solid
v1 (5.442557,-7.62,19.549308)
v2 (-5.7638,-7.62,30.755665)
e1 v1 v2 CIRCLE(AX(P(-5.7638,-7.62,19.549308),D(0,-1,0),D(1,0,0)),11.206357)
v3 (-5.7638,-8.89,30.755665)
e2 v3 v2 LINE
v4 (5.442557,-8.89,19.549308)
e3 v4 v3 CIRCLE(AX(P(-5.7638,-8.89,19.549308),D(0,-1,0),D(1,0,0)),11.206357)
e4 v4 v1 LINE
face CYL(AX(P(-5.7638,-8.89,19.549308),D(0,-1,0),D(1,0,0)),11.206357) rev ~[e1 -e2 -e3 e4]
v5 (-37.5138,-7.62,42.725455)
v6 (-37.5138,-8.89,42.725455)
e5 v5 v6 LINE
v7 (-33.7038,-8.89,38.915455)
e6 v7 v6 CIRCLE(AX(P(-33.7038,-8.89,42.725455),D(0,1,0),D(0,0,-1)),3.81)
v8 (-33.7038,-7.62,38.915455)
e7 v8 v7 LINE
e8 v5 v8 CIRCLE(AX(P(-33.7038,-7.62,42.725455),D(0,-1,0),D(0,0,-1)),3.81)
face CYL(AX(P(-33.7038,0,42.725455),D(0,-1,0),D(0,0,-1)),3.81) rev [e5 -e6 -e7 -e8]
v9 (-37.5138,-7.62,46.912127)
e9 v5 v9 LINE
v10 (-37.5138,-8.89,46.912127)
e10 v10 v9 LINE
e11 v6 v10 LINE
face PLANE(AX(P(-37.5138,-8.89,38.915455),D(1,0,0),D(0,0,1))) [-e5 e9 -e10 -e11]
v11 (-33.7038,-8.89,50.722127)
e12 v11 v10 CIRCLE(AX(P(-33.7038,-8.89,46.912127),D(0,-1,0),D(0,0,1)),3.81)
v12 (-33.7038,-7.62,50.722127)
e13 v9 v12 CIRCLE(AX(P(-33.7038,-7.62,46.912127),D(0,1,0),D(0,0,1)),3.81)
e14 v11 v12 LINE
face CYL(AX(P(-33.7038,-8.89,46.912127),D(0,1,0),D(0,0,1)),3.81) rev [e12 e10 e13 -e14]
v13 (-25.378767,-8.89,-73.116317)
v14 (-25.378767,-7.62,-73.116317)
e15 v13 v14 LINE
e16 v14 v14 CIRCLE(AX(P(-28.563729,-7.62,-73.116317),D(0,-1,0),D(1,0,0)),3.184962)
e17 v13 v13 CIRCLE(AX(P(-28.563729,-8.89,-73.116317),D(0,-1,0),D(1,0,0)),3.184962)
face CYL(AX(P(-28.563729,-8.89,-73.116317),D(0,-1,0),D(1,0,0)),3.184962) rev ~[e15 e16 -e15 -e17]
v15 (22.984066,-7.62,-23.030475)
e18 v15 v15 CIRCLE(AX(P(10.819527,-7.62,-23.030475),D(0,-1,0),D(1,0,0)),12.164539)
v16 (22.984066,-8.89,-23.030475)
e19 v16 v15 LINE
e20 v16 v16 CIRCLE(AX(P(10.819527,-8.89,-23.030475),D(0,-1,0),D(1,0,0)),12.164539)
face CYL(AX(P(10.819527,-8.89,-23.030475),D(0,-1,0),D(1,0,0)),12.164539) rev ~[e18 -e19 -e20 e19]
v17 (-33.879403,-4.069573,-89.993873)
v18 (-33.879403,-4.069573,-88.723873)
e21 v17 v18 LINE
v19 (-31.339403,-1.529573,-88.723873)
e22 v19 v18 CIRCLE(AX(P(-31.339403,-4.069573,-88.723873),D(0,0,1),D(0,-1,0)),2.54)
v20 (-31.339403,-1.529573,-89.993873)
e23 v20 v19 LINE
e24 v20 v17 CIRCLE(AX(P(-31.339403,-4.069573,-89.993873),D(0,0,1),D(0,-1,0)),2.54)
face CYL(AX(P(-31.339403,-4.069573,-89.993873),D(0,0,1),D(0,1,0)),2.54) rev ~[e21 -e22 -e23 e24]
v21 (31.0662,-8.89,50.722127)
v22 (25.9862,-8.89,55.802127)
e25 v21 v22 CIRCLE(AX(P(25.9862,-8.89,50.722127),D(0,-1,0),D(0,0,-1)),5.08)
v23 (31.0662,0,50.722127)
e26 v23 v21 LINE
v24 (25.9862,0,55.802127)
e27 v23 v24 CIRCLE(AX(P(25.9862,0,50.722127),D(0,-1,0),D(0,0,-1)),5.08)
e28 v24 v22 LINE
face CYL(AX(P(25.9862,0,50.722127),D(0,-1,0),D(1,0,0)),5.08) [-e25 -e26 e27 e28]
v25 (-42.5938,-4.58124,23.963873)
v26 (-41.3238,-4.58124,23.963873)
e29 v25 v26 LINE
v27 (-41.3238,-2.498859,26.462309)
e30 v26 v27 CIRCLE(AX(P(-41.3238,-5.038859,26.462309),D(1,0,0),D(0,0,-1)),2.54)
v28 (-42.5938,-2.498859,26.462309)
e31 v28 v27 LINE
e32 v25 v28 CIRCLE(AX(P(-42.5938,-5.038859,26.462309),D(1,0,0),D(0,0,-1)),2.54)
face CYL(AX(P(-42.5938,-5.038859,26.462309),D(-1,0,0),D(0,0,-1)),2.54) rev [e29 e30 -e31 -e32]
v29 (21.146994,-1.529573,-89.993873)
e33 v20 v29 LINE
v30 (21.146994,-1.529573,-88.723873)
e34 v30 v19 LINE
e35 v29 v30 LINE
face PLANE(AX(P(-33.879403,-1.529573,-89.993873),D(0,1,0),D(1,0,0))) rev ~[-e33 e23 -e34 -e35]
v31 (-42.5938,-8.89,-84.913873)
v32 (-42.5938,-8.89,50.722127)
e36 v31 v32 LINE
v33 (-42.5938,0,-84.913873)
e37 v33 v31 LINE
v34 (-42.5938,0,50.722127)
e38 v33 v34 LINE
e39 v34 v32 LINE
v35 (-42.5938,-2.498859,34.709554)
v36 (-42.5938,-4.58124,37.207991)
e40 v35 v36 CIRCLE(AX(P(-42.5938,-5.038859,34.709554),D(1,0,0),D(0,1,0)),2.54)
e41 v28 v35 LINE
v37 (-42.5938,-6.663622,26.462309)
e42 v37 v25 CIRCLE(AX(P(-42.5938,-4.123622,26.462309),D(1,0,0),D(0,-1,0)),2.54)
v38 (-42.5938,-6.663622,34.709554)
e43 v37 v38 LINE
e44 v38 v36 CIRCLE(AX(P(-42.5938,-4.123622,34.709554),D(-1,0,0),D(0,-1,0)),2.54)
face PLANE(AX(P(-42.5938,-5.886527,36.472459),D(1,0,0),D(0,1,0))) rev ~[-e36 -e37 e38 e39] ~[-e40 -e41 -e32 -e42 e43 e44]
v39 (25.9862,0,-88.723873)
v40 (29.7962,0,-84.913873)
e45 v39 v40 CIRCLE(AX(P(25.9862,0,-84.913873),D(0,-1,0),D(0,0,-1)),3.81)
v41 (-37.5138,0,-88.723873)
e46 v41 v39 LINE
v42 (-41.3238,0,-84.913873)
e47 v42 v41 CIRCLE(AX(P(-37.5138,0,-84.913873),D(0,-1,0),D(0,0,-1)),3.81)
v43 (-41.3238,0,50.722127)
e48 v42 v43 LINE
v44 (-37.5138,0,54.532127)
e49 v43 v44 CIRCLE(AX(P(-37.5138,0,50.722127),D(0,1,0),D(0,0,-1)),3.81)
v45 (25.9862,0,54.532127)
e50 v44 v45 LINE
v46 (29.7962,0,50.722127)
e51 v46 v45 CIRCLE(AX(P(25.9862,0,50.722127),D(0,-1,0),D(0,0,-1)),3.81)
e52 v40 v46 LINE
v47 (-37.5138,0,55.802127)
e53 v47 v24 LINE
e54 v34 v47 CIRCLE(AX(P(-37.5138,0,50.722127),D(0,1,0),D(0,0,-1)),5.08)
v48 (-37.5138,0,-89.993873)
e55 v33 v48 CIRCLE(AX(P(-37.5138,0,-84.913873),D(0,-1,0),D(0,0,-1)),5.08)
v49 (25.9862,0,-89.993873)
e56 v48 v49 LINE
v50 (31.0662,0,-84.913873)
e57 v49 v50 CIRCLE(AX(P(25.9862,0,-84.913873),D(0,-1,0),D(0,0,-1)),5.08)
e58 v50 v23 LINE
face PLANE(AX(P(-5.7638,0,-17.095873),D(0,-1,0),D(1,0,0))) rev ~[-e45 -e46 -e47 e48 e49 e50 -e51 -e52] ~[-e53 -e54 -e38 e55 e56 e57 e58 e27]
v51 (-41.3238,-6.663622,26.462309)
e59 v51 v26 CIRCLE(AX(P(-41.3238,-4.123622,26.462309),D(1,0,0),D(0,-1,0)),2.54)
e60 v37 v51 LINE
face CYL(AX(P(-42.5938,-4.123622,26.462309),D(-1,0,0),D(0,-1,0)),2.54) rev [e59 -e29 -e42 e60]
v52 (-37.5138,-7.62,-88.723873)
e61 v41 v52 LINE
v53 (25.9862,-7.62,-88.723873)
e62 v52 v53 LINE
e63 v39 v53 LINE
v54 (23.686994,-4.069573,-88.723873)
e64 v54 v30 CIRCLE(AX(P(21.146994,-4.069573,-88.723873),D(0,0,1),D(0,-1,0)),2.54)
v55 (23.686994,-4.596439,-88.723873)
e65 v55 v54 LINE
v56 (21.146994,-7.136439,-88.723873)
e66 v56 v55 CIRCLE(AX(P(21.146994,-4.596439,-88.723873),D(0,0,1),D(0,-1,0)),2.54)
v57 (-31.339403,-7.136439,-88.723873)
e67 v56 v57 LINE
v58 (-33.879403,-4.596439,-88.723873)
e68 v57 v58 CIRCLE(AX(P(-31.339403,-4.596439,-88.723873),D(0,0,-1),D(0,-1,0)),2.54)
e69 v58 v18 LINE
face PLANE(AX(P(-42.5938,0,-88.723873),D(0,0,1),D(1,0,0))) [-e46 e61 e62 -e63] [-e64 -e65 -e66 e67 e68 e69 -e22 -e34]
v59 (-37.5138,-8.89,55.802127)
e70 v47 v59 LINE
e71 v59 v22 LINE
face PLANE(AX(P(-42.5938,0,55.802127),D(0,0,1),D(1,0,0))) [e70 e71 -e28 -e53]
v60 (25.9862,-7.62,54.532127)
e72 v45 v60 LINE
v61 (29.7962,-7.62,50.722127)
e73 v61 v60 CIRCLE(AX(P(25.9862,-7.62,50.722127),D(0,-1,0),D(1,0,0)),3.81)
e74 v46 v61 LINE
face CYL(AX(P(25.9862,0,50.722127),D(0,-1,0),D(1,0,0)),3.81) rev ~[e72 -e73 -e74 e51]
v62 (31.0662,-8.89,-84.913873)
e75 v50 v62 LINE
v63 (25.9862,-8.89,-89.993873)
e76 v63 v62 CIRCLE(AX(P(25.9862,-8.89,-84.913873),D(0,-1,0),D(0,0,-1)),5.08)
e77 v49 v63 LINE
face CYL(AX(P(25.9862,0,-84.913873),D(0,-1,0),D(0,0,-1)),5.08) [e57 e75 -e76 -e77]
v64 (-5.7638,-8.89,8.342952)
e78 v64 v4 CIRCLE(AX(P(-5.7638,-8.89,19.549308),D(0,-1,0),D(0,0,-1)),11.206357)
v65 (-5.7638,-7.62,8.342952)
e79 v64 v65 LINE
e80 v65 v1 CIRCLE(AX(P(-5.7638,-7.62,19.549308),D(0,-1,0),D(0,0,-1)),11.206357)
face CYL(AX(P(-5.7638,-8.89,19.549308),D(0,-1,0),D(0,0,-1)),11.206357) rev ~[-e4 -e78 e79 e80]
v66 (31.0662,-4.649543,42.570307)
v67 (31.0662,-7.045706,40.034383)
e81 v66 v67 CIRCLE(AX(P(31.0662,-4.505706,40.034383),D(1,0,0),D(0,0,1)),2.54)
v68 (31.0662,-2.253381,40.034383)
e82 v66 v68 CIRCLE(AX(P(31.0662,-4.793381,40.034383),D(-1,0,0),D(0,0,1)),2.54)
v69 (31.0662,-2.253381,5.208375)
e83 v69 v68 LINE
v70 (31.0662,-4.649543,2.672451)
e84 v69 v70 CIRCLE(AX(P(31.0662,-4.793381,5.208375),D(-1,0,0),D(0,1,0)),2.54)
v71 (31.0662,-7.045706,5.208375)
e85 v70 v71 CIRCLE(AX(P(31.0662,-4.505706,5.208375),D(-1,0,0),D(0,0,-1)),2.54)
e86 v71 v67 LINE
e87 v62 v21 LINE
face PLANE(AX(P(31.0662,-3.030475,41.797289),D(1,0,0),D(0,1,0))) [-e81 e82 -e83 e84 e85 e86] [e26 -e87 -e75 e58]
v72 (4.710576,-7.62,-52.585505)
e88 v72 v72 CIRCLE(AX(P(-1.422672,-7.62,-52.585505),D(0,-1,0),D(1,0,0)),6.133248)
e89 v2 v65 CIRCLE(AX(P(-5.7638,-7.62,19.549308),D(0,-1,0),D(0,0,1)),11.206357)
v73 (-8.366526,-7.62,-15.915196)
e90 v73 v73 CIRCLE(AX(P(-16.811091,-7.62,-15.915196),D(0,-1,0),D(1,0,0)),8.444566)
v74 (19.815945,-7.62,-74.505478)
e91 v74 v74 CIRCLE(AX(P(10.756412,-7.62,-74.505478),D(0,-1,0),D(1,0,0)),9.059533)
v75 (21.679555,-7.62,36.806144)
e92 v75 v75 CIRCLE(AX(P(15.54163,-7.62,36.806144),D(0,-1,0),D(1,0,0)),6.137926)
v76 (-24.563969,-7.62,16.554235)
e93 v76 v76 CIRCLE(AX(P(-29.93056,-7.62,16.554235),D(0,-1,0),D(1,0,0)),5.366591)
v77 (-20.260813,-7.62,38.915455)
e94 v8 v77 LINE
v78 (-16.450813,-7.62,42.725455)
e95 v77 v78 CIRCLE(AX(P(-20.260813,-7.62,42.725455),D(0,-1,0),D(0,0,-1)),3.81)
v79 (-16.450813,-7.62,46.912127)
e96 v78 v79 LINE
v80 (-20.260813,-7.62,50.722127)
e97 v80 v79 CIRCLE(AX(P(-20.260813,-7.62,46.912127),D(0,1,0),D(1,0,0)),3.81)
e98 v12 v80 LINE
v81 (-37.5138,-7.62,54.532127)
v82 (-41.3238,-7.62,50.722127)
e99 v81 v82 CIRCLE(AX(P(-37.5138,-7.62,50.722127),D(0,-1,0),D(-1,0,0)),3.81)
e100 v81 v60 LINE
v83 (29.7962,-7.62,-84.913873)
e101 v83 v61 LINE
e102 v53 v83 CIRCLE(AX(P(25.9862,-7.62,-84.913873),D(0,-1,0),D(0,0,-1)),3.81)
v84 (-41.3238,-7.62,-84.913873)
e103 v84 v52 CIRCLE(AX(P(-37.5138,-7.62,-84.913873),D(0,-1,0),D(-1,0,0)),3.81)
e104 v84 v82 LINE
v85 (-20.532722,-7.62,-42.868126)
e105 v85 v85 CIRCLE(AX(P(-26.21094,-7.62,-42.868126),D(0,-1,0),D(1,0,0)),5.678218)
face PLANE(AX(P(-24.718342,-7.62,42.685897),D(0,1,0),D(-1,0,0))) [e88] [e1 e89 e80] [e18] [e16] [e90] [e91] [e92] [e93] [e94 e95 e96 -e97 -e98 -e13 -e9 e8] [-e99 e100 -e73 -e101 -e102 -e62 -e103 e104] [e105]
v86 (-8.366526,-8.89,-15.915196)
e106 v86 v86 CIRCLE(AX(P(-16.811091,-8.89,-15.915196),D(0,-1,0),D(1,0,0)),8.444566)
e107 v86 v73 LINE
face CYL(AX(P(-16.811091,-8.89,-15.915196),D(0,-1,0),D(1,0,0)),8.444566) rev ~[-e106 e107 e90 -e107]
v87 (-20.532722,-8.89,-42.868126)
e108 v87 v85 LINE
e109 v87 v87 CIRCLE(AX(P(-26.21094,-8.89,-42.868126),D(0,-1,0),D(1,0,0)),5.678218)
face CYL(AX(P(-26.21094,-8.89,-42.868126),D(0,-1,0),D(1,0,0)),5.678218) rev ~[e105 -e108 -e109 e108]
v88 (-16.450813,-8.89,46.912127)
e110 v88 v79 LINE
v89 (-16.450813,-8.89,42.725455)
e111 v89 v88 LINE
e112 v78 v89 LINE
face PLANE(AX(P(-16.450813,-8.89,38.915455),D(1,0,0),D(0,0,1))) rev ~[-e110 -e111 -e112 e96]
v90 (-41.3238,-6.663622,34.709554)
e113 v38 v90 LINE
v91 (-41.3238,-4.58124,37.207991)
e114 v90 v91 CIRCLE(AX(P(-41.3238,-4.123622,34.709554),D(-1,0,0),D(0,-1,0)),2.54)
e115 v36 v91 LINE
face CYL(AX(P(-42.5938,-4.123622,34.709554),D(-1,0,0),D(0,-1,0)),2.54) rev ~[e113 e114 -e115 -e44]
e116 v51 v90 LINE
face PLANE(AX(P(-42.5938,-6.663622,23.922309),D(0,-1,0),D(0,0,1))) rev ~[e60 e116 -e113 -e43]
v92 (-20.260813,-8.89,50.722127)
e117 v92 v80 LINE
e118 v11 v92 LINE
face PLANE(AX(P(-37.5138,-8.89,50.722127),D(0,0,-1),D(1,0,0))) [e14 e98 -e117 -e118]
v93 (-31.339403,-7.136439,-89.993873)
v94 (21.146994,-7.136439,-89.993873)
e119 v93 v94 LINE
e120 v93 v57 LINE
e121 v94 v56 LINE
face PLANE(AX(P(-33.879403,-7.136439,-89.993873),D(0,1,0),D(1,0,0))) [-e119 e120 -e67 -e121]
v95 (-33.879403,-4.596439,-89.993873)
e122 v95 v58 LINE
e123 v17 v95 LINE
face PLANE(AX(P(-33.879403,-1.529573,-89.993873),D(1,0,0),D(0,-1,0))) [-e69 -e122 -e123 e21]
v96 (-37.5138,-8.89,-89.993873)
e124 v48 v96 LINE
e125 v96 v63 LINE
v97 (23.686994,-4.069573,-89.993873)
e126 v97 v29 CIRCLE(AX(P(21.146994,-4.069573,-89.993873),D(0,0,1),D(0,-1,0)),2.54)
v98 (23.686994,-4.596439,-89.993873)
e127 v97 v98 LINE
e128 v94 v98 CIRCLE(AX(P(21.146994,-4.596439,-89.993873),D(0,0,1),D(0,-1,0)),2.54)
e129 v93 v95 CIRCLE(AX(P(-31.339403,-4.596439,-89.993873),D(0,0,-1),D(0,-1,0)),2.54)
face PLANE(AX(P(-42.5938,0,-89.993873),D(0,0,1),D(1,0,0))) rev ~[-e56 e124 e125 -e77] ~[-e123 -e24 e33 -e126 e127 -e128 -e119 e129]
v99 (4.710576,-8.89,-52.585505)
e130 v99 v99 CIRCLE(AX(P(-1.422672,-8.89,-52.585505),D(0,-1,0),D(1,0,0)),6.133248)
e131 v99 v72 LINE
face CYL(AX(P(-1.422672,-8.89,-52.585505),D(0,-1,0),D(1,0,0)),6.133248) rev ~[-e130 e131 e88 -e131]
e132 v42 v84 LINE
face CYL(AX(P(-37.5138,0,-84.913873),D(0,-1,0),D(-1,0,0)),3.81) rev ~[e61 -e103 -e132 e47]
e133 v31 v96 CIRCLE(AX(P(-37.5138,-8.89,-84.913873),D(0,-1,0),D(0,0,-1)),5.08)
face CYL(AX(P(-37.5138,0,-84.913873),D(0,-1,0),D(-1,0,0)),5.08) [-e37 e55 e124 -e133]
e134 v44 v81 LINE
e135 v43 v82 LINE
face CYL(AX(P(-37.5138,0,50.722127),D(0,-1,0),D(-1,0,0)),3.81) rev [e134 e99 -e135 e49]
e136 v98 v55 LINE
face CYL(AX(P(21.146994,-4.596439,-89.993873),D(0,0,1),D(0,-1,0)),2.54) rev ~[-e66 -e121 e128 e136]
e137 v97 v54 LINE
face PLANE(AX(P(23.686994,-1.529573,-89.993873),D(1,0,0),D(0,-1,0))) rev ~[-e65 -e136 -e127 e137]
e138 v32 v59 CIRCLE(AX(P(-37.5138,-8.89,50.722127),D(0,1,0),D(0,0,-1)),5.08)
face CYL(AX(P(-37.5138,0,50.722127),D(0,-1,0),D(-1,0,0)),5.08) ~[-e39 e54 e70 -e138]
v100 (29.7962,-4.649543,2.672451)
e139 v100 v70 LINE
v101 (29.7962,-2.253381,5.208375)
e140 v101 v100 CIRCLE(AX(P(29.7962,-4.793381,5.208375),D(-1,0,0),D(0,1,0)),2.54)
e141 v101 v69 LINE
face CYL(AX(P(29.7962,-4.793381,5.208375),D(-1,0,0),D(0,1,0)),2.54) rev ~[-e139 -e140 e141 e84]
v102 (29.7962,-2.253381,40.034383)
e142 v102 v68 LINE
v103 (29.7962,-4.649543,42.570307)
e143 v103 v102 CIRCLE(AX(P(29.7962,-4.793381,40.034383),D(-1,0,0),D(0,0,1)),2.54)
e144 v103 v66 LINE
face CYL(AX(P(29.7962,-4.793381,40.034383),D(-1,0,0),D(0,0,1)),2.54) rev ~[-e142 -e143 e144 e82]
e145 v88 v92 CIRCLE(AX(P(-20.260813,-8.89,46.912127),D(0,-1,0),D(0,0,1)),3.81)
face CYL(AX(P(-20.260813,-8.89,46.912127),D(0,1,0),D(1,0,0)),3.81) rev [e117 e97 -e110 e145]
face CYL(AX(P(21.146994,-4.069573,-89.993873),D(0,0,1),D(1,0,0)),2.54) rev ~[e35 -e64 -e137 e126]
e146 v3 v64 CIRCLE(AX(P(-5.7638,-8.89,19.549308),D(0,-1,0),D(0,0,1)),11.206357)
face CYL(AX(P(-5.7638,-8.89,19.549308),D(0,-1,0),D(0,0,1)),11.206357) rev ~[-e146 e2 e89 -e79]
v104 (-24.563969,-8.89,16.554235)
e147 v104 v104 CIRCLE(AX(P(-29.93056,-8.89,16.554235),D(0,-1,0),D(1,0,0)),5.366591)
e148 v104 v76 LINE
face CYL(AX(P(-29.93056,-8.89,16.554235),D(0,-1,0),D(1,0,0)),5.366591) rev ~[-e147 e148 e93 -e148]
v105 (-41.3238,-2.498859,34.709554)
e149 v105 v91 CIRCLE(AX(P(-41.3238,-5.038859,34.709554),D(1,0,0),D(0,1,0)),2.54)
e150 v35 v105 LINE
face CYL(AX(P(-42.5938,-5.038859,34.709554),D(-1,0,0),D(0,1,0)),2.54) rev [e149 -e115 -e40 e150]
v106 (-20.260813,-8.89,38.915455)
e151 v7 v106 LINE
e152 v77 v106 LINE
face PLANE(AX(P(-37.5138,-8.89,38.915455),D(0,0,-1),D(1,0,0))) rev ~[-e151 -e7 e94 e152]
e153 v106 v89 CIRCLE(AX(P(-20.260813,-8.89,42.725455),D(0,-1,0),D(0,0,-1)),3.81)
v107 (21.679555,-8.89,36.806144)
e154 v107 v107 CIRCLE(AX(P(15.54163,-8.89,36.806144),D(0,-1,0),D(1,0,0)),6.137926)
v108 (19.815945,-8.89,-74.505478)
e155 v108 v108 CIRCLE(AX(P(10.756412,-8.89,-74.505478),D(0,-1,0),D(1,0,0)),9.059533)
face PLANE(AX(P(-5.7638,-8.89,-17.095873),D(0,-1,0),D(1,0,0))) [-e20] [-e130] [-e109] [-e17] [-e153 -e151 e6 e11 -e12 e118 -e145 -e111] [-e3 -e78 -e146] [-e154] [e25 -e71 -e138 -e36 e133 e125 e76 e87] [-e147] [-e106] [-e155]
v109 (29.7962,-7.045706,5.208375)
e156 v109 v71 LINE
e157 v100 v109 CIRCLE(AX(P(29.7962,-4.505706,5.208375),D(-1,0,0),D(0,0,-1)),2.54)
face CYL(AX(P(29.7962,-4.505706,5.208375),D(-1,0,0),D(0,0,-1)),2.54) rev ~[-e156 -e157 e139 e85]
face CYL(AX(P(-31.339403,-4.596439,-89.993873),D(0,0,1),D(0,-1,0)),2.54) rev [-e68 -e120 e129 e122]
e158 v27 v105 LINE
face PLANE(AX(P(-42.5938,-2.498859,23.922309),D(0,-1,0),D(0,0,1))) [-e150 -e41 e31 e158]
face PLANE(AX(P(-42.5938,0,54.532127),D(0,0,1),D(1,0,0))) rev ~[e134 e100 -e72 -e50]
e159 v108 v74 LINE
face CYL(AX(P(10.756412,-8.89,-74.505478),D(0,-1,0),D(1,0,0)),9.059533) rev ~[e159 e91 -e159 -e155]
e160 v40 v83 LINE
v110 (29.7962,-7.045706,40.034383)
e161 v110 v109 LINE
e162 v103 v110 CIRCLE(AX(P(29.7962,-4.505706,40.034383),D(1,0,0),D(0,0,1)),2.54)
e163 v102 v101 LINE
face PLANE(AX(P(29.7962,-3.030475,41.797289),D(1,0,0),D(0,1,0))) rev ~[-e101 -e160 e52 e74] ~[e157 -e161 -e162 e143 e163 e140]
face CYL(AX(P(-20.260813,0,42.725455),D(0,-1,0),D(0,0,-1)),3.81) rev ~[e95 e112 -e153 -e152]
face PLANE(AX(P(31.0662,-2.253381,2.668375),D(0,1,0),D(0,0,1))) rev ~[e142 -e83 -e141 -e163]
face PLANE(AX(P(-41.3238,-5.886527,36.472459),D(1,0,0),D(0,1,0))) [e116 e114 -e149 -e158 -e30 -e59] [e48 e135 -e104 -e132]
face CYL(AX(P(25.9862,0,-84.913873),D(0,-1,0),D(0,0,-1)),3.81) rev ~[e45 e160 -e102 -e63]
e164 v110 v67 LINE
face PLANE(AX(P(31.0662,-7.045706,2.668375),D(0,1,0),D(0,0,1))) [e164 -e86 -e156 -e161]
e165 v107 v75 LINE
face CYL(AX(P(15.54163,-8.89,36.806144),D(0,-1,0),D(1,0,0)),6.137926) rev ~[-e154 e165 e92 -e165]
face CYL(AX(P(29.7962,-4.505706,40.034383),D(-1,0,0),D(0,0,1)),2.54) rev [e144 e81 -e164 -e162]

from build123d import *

# Parameters (mm, degrees)
F0_W         = 73.66
F0_H         = 145.796
F1_DEPTH     = 8.89
F2_R         = 5.08
F3_W         = 21.0629868459
F3_H         = 11.8066714083
F4_DEPTH     = 12.7
F5_R         = 3.81
F7_T         = -1.27
F9_DEPTH     = 7.62
F10_W        = 4.164762795
F10_H        = 13.3272446692
F11_DEPTH    = 25.4
F12_T1_DEPTH = 1.27
F13_W        = 57.5663968921
F13_H        = 5.6068669073
F14_DEPTH    = 25.4
F15_R        = 2.54
F16_W        = 4.7923256643
F16_H        = 39.9060079362
F17_DEPTH    = 25.4
F18_T1_DEPTH = 1.27
F20_DEPTH    = 25.4
F21_R        = 12.1645390549
F21_R_2      = 8.4445659424
F21_R_3      = 5.6782177744
F21_R_4      = 6.1332477191
F21_R_5      = 9.0595333528
F21_R_6      = 3.1849618728
F21_R_7      = 5.3665907278
F21_R_8      = 6.1379255293
F22_DEPTH    = 25.4


# Not quite as in the source:
# - a fillet or chamfer that OpenCascade refuses, or shapes differently, is made with other operations: its cross-section is extruded or revolved along the edge and cut away or added


with BuildPart() as f1:
    # F0 (on Front) → F1 (new body)
    with BuildSketch(Plane.XZ):
        with Locations((-5.763799886, -17.0958732503)):
            Rectangle(F0_W, F0_H)
    extrude(amount=F1_DEPTH)

    # F2
    f2_edges = [f1.edges().sort_by_distance(p)[0] for p in [
        (31.0662, -4.445, 55.802127),
        (-42.5938, -4.445, 55.802127),
        (31.0662, -4.445, -89.993873),
        (-42.5938, -4.445, -89.993873),
    ]]
    fillet(f2_edges, radius=F2_R)

    # F3 (on face) → F4 (cut, symmetric)
    with BuildSketch(Plane.XZ.offset(8.89)):
        with Locations((-26.9823064631, 44.8187910455)):
            Rectangle(F3_W, F3_H)
    extrude(amount=F4_DEPTH, both=True, mode=Mode.SUBTRACT)

    # F5
    f5_edges = [f1.edges().sort_by_distance(p)[0] for p in [
        (-16.450813, -4.445, 50.722127),
        (-37.5138, -4.445, 50.722127),
        (-37.5138, -4.445, 38.915455),
        (-16.450813, -4.445, 38.915455),
    ]]
    fillet(f5_edges, radius=F5_R)

    # F7
    f7_openings = [f1.faces().sort_by_distance(p)[0] for p in [
        (-5.285571, 0, -18.491325),
    ]]
    offset(amount=F7_T, openings=f7_openings)

    # F8 (on face) → F9 (cut)
    with BuildSketch(Plane(origin=(0, 0, 0), x_dir=(-1, 0, 0), z_dir=(0, 1, 0))):
        Polygon((23.2353508472, 53.487226367), (11.2448604777, 51.826223731), (11.2448604777, 31.8353585899), (37.2746288776, 33.5012637079), (40.1331484318, 42.7181646228), (38.7322939932, 52.0863756537), align=None)
    extrude(amount=-F9_DEPTH, mode=Mode.SUBTRACT)

    # F10 (on face) → F11 (cut)
    with BuildSketch(Plane(origin=(-42.593799886, 0, 0), x_dir=(0, -1, 0), z_dir=(-1, 0, 0))):
        with Locations((4.5812404715, 30.585931614)):
            Rectangle(F10_W, F10_H)
    extrude(amount=-F11_DEPTH, mode=Mode.SUBTRACT)

    # F12: fillet of radius 2.54 on 4 edges, made by hand

    # F12_s2 → F12_t1 (join)
    with BuildSketch(Plane.YZ.offset(-42.593799886)):
        with BuildLine():
            ThreePointArc((-6.6636218689, 34.7095539486), (-5.9196730932, 36.5056051729), (-4.1236218689, 37.2495539486))
            Line((-4.1236218689, 37.2495539486), (-6.6636218689, 37.2495539486))
            Line((-6.6636218689, 37.2495539486), (-6.6636218689, 34.7095539486))
        make_face()
        with BuildLine():
            ThreePointArc((-6.6636218689, 26.4623092794), (-5.9196730932, 24.6662580552), (-4.1236218689, 23.9223092794))
            Line((-4.1236218689, 23.9223092794), (-6.6636218689, 23.9223092794))
            Line((-6.6636218689, 23.9223092794), (-6.6636218689, 26.4623092794))
        make_face()
        with BuildLine():
            ThreePointArc((-2.498859074, 34.7095539486), (-3.2428078498, 36.5056051729), (-5.038859074, 37.2495539486))
            Line((-5.038859074, 37.2495539486), (-2.498859074, 37.2495539486))
            Line((-2.498859074, 37.2495539486), (-2.498859074, 34.7095539486))
        make_face()
        with BuildLine():
            ThreePointArc((-5.038859074, 23.9223092794), (-3.2428078498, 24.6662580552), (-2.498859074, 26.4623092794))
            Line((-2.498859074, 26.4623092794), (-2.498859074, 23.9223092794))
            Line((-2.498859074, 23.9223092794), (-5.038859074, 23.9223092794))
        make_face()
    extrude(amount=F12_T1_DEPTH)

    # F13 (on face) → F14 (cut)
    with BuildSketch(Plane(origin=(0, 0, -89.9938732503), x_dir=(1, 0, 0), z_dir=(0, 0, -1))):
        with Locations((-5.0962045789, 4.3330059852)):
            Rectangle(F13_W, F13_H)
    extrude(amount=-F14_DEPTH, mode=Mode.SUBTRACT)

    # F15
    f15_edges = [f1.edges().sort_by_distance(p)[0] for p in [
        (-33.879403, -7.136439, -89.358873),
        (23.686994, -7.136439, -89.358873),
        (-33.879403, -1.529573, -89.358873),
        (23.686994, -1.529573, -89.358873),
    ]]
    fillet(f15_edges, radius=F15_R)

    # F16 (on face) → F17 (cut)
    with BuildSketch(Plane.YZ.offset(31.066200114)):
        with Locations((-4.6495434362, 22.6213793503)):
            Rectangle(F16_W, F16_H)
    extrude(amount=-F17_DEPTH, mode=Mode.SUBTRACT)

    # F18: fillet of radius 2.54 on 4 edges, made by hand

    # F18_s2 → F18_t1 (join)
    with BuildSketch(Plane.YZ.offset(29.796200114)):
        with BuildLine():
            ThreePointArc((-4.7933806041, 42.5743833184), (-2.9973293799, 41.8304345426), (-2.2533806041, 40.0343833184))
            Line((-2.2533806041, 40.0343833184), (-2.2533806041, 42.5743833184))
            Line((-2.2533806041, 42.5743833184), (-4.7933806041, 42.5743833184))
        make_face()
        with BuildLine():
            ThreePointArc((-2.2533806041, 5.2083753822), (-2.9973293799, 3.412324158), (-4.7933806041, 2.6683753822))
            Line((-4.7933806041, 2.6683753822), (-2.2533806041, 2.6683753822))
            Line((-2.2533806041, 2.6683753822), (-2.2533806041, 5.2083753822))
        make_face()
        with BuildLine():
            ThreePointArc((-4.5057062684, 42.5743833184), (-6.3017574926, 41.8304345426), (-7.0457062684, 40.0343833184))
            Line((-7.0457062684, 40.0343833184), (-7.0457062684, 42.5743833184))
            Line((-7.0457062684, 42.5743833184), (-4.5057062684, 42.5743833184))
        make_face()
        with BuildLine():
            ThreePointArc((-4.5057062684, 2.6683753822), (-6.3017574926, 3.412324158), (-7.0457062684, 5.2083753822))
            Line((-7.0457062684, 5.2083753822), (-7.0457062684, 2.6683753822))
            Line((-7.0457062684, 2.6683753822), (-4.5057062684, 2.6683753822))
        make_face()
    extrude(amount=F18_T1_DEPTH)

    # F19 (on face) → F20 (cut)
    with BuildSketch(Plane.XZ.offset(8.89)):
        with BuildLine():
            Line((-5.763799886, 8.3429517969), (-5.763799886, 30.7556648925))
            ThreePointArc((-5.763799886, 30.7556648925), (-16.9701564338, 19.5493083447), (-5.763799886, 8.3429517969))
        make_face()
        with BuildLine():
            ThreePointArc((5.4425566618, 19.5493083447), (2.1602908213, 27.473399052), (-5.763799886, 30.7556648925))
            Line((-5.763799886, 30.7556648925), (-5.763799886, 8.3429517969))
            ThreePointArc((-5.763799886, 8.3429517969), (2.1602908213, 11.6252176374), (5.4425566618, 19.5493083447))
        make_face()
    extrude(amount=-F20_DEPTH, mode=Mode.SUBTRACT)

    # F21 (on face) → F22 (cut)
    with BuildSketch(Plane.XZ.offset(8.89)):
        with Locations((10.8195273206, -23.030474782)):
            Circle(F21_R)
        with Locations((-16.8110914528, -15.915196389)):
            Circle(F21_R_2)
        with Locations((-26.2109395117, -42.8681261837)):
            Circle(F21_R_3)
        with Locations((-1.4226717176, -52.5855049491)):
            Circle(F21_R_4)
        with Locations((10.7564115897, -74.5054781437)):
            Circle(F21_R_5)
        with Locations((-28.563728556, -73.1163173914)):
            Circle(F21_R_6)
        with Locations((-29.9305599183, 16.5542345494)):
            Circle(F21_R_7)
        with Locations((15.5416298658, 36.8061438203)):
            Circle(F21_R_8)
    extrude(amount=-F22_DEPTH, mode=Mode.SUBTRACT)


solid = f1.part
